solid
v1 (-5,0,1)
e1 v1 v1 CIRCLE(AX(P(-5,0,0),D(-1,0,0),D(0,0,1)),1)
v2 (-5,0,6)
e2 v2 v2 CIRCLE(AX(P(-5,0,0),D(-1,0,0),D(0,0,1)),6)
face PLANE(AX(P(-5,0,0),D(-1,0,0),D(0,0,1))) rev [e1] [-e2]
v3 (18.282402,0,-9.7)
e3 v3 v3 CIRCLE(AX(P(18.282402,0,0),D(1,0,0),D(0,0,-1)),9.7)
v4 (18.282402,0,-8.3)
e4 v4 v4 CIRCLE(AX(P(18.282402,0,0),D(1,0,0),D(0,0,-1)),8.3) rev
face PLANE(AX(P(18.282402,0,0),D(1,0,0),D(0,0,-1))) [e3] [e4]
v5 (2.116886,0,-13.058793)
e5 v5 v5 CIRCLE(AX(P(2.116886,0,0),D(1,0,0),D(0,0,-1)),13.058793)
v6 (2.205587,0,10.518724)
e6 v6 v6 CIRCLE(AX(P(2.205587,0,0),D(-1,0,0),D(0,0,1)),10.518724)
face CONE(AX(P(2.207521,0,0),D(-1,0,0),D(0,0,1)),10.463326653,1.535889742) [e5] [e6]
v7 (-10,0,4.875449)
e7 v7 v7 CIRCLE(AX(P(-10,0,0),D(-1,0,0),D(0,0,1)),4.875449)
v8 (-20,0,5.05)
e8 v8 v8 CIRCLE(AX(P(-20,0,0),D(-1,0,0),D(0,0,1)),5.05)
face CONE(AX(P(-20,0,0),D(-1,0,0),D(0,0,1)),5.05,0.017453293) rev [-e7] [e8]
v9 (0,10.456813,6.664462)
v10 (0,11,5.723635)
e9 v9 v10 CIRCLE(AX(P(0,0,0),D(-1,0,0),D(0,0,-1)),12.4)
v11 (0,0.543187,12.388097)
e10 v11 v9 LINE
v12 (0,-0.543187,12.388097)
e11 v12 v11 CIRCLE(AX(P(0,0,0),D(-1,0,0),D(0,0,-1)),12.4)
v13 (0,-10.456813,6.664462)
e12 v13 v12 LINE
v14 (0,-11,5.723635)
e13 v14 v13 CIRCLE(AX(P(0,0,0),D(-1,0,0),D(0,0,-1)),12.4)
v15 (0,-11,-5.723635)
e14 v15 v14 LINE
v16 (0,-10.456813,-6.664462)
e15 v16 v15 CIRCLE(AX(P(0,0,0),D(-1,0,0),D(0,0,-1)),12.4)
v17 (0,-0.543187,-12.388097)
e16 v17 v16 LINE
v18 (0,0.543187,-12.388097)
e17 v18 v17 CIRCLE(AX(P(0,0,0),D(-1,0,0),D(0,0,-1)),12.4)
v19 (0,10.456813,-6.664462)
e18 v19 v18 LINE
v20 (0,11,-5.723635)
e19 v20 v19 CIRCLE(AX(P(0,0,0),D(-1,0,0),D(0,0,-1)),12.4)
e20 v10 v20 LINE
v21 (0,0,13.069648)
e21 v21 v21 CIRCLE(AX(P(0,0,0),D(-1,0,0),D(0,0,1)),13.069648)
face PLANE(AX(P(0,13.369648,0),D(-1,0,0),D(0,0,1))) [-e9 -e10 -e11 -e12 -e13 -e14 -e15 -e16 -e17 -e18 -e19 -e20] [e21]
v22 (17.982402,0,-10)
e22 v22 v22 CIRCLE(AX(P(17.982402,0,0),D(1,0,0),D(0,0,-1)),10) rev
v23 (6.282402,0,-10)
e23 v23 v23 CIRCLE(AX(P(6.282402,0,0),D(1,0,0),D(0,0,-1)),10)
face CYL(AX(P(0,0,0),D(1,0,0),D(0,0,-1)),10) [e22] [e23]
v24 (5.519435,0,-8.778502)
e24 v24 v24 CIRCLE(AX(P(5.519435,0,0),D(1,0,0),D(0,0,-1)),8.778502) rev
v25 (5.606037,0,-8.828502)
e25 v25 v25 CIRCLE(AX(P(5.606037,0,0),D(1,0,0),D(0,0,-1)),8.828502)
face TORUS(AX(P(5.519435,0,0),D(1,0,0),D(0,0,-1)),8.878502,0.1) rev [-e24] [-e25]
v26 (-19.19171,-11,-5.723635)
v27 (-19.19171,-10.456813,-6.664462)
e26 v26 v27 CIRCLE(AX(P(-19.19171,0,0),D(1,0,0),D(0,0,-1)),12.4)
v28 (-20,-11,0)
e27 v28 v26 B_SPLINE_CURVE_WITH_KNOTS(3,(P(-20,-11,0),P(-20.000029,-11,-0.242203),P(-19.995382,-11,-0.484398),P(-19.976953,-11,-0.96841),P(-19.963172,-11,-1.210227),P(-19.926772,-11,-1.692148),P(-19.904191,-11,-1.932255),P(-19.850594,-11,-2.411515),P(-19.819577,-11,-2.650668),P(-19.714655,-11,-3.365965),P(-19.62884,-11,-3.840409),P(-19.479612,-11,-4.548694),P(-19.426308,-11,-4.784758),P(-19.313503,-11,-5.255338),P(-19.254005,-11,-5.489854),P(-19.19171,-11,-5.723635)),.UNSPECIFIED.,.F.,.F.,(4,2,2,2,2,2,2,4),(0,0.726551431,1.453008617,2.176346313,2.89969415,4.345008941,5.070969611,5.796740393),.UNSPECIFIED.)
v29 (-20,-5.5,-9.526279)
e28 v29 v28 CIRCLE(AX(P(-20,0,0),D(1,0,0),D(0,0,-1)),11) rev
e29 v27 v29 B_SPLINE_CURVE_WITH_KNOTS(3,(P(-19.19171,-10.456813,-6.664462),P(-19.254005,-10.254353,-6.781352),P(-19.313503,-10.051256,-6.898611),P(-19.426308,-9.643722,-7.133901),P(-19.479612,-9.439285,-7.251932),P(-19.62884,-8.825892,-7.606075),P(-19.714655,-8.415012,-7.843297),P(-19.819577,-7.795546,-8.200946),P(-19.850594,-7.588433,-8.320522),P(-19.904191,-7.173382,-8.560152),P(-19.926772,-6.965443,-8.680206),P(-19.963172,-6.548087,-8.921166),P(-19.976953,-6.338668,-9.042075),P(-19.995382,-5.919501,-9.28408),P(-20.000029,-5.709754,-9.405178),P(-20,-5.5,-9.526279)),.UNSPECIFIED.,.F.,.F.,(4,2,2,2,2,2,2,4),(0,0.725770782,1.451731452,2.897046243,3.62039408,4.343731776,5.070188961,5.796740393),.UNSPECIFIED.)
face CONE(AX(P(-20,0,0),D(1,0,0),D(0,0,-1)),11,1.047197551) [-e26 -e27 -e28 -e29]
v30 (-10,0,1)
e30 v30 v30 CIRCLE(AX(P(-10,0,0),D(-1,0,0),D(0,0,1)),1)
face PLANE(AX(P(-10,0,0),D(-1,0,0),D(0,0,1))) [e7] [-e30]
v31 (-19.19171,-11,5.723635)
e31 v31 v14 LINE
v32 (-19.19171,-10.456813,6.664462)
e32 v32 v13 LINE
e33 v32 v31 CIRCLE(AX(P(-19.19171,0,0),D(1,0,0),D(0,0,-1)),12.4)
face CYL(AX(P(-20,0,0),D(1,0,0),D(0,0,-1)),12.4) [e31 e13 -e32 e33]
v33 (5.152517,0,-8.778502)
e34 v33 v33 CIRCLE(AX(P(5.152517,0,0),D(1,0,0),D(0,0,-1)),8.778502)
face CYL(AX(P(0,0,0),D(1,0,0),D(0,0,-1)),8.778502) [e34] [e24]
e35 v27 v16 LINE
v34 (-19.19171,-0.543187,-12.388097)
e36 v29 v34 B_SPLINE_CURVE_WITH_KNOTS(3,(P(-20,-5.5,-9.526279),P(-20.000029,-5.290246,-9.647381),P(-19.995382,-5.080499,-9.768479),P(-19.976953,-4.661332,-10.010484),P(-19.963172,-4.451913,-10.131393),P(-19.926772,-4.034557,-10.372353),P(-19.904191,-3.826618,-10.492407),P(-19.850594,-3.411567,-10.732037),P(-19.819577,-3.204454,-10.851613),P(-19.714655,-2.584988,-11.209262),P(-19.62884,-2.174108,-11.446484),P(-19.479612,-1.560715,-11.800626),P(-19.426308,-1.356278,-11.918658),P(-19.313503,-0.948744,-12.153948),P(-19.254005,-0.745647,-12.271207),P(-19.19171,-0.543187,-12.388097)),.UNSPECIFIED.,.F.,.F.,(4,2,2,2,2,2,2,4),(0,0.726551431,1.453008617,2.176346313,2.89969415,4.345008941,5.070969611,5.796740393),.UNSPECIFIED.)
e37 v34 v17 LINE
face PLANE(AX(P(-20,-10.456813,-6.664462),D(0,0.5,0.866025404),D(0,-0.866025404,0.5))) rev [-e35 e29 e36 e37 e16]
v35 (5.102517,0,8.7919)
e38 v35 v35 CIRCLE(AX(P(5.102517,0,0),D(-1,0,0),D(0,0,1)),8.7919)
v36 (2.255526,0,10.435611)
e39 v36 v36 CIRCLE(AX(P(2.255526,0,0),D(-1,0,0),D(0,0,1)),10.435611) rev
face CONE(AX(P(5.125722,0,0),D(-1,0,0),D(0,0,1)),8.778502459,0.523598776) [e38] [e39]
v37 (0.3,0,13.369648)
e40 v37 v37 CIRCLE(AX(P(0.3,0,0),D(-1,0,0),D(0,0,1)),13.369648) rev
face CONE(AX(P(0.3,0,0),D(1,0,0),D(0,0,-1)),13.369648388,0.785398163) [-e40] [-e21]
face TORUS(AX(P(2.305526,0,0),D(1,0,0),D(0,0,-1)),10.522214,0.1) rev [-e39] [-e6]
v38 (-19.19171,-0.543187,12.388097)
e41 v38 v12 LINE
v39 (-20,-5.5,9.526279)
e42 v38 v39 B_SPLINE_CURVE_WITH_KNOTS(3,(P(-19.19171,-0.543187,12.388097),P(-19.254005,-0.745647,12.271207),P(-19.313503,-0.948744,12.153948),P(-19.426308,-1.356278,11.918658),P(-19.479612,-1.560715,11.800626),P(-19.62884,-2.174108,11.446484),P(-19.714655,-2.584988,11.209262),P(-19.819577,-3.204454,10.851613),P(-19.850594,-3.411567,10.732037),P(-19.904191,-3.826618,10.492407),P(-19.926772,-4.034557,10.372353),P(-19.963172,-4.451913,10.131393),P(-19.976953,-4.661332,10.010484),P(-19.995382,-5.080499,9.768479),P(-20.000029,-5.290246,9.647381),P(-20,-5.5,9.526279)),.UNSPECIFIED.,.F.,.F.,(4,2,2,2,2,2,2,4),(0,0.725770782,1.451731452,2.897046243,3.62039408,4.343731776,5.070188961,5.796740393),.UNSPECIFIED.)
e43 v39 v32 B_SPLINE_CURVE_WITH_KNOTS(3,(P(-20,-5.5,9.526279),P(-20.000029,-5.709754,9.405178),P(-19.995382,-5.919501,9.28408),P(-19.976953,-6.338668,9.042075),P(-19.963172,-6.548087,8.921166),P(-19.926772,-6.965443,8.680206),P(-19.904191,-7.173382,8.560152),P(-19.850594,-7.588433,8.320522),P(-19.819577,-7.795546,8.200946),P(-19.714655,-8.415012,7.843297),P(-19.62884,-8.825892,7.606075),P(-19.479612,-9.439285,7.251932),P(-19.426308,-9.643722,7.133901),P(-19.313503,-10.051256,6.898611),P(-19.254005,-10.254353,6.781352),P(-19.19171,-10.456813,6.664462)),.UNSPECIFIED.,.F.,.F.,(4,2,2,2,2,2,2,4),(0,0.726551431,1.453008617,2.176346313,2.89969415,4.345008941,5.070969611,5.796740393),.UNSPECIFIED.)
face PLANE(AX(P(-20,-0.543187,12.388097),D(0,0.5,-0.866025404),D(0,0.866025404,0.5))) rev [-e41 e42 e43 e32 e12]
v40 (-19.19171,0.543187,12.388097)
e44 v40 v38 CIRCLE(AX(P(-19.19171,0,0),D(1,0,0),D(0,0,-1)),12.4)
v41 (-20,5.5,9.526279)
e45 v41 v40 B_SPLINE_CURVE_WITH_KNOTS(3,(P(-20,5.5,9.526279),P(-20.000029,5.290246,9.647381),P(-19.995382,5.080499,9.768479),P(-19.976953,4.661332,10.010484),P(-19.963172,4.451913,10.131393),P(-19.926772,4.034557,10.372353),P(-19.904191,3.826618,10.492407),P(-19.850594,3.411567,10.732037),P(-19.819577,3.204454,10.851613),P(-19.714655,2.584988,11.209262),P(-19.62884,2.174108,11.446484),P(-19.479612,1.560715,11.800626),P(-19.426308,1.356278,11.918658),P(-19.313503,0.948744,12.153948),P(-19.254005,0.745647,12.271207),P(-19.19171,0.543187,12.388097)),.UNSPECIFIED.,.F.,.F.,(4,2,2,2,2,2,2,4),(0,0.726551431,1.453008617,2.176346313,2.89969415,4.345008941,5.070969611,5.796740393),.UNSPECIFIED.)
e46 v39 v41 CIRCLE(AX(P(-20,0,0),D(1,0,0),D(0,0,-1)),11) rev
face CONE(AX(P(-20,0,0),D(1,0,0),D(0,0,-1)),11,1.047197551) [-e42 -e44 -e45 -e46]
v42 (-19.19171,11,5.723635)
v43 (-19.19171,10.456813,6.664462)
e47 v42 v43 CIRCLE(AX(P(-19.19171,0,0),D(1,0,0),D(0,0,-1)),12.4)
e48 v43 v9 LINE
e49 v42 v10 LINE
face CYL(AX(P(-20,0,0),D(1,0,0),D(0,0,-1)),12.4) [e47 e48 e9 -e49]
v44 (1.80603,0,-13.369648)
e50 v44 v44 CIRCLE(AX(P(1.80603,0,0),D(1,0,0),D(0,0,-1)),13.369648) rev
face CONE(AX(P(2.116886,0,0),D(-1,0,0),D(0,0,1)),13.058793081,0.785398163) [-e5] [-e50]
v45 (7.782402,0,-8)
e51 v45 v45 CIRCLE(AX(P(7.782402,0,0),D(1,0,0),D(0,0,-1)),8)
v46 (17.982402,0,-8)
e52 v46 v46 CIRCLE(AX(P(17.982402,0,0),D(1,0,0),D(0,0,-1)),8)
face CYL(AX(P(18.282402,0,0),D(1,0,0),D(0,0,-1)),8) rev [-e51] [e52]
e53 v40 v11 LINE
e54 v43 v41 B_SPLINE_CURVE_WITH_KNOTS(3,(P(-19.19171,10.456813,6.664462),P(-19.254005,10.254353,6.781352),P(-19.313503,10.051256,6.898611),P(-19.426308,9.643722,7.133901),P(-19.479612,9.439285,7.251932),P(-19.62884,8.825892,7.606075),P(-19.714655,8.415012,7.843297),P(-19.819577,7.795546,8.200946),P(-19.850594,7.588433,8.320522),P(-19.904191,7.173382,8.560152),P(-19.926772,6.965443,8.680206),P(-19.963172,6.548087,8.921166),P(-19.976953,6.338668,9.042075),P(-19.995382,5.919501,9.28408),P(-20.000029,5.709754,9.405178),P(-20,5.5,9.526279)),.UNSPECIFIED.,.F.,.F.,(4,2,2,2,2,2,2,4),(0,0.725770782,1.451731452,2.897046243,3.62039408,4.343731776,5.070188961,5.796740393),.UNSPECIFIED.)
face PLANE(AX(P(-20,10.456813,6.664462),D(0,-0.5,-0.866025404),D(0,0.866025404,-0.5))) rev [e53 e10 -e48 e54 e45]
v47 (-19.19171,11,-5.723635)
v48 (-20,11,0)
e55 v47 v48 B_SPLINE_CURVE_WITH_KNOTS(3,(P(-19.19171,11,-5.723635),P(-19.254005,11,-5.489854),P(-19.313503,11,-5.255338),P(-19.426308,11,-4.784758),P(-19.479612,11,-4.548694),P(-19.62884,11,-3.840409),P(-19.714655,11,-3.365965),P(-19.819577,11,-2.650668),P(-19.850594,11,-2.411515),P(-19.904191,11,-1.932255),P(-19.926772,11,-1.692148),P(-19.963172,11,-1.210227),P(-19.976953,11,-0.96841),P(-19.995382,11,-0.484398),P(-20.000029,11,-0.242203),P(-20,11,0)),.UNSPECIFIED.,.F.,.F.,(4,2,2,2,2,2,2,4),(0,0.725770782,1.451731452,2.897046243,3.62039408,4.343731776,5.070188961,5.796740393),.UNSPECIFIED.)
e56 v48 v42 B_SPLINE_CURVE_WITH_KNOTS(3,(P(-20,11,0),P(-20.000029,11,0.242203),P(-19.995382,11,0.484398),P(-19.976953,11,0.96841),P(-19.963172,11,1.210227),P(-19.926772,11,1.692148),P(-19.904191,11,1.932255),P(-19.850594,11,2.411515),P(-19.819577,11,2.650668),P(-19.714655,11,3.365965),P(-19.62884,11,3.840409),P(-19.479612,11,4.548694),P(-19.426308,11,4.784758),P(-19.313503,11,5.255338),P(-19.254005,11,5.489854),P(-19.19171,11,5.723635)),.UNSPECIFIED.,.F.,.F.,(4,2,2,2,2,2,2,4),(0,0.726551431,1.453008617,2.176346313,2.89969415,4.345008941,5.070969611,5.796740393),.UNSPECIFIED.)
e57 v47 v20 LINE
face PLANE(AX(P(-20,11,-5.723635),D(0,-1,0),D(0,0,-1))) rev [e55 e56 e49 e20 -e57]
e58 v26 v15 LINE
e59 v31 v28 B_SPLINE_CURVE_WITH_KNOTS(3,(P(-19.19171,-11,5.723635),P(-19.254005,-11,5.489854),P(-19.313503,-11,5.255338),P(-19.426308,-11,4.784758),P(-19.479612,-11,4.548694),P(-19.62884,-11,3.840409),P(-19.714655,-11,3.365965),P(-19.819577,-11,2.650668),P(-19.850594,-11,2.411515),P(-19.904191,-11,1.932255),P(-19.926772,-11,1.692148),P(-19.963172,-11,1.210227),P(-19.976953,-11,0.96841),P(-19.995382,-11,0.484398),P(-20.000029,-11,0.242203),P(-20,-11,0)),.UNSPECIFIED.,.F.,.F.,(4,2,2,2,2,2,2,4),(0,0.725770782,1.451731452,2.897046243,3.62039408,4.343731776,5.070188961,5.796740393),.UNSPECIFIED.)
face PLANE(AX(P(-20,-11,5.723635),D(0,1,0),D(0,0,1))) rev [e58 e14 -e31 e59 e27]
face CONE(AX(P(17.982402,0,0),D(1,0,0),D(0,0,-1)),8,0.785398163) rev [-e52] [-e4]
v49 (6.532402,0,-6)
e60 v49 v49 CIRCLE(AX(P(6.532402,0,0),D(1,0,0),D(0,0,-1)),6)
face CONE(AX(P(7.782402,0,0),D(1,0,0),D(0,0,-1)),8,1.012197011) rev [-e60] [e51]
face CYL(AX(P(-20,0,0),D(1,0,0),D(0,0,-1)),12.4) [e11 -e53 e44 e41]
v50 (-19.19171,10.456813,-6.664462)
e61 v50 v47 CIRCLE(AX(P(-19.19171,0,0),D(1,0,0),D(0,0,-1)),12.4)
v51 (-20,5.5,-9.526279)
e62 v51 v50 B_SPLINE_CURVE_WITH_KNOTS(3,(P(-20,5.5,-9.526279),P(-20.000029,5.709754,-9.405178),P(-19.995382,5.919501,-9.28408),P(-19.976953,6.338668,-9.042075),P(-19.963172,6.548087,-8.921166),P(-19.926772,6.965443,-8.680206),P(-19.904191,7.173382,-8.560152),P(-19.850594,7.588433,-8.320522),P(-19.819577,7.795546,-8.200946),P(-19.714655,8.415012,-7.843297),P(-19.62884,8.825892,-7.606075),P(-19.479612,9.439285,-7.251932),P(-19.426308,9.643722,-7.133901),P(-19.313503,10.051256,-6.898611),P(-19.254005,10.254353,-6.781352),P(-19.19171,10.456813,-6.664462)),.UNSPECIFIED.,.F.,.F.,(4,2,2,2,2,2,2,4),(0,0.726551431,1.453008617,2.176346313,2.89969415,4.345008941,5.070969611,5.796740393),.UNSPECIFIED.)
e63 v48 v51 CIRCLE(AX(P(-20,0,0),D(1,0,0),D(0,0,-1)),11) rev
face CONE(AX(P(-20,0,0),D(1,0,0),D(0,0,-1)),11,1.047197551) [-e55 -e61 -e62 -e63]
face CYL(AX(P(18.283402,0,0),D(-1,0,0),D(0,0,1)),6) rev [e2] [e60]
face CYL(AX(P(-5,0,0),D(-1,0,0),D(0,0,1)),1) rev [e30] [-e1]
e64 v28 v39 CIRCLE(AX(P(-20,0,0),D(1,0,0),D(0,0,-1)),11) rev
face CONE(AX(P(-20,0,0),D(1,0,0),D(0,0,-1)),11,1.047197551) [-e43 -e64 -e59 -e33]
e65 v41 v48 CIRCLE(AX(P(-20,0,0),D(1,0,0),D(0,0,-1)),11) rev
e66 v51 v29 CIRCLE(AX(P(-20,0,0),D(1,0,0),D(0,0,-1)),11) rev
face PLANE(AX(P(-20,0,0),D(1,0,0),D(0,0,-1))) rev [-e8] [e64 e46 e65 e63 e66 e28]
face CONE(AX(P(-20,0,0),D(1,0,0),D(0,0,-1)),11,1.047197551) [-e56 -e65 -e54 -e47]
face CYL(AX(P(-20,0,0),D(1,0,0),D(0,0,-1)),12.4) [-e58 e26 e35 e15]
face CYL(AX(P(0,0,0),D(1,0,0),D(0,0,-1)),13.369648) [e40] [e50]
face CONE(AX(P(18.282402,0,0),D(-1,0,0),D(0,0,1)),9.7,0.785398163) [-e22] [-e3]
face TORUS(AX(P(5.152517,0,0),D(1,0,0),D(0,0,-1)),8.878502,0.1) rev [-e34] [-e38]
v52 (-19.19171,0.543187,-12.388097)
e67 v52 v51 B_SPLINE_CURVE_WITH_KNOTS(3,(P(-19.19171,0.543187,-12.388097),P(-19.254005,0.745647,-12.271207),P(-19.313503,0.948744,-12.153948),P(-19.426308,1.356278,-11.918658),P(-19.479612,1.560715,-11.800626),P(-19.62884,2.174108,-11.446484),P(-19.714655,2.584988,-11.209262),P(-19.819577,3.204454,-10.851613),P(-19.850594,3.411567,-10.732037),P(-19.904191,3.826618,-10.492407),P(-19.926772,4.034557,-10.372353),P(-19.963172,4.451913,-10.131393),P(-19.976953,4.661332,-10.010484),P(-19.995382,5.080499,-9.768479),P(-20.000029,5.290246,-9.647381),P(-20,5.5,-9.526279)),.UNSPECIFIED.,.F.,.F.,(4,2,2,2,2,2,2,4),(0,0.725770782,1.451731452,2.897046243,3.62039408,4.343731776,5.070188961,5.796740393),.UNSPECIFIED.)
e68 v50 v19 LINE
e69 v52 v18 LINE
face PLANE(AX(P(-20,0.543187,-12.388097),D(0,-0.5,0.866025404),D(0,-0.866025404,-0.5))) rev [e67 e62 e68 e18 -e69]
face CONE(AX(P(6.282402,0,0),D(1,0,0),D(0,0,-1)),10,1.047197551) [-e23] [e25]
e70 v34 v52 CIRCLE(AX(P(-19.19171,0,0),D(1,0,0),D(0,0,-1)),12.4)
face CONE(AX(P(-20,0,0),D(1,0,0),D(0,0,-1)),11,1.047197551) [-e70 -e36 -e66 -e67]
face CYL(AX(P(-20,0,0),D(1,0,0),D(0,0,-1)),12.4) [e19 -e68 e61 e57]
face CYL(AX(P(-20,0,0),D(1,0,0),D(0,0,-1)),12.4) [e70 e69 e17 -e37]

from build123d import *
from OCP.BRepFilletAPI import BRepFilletAPI_MakeChamfer

# Parameters (mm, degrees)
ESTRUSIONE_ESTRUSIONE1_DEPTH = 20
FORO_16_0_16_1_D             = 16
FORO_16_0_16_1_DEPTH         = 10.5
FORO_16_0_16_1_TIP           = 4.99999996
SMUSSO1_SIZE                 = 0.3
SMUSSO2_SIZE                 = 0.808290377
SMUSSO2_SIZE_2               = 1.4
RACCORDO1_R                  = 0.1
SMUSSO3_SIZE                 = 0.3
SMUSSO3_SIZE2                = 0.311044787
SCHIZZO5_R                   = 5.05
TAGLIO_ESTRUSIONE1_DEPTH     = 10
TAGLIO_ESTRUSIONE1_DRAFT     = -1
SCHIZZO6_R                   = 1
TAGLIO_ESTRUSIONE2_DEPTH     = 5
TAGLIO_ESTRUSIONE3_REACH     = 31.993
SCHIZZO7_R                   = 6


with BuildPart() as part:
    # Schizzo1 → Rivoluzione1 (revolve)
    with BuildSketch(Plane.XY, mode=Mode.PRIVATE) as rivoluzione1_sk:
        Polygon((0, 13.369648388), (0, 0), (18.282401556, 0), (18.282401556, 10), (6.282401556, 10), (5.577169622, 8.778502459), (5.12572234, 8.778502459), (2.207521234, 10.463326653), (2.106030242, 13.369648388), align=None)
    revolve(rivoluzione1_sk.sketch.rotate(Axis((0, 0, 0), (1, 0, 0)), 270), axis=Axis((0, 0, 0), (1, 0, 0)))

    # Schizzo2 → Estrusione-Estrusione1 (add)
    with BuildSketch(Plane.ZY):
        with BuildLine():
            Line((5.723635209, -11), (-5.723635209, -11))
            ThreePointArc((-5.723635209, -11), (-6.2, -10.738715007), (-6.664461837, -10.456813493))
            Line((-6.664461837, -10.456813493), (-12.388097046, -0.543186507))
            ThreePointArc((-12.388097046, -0.543186507), (-12.4, 0), (-12.388097046, 0.543186507))
            Line((-12.388097046, 0.543186507), (-6.664461837, 10.456813493))
            ThreePointArc((-6.664461837, 10.456813493), (-6.2, 10.738715007), (-5.723635209, 11))
            Line((-5.723635209, 11), (5.723635209, 11))
            ThreePointArc((5.723635209, 11), (6.2, 10.738715007), (6.664461837, 10.456813493))
            Line((6.664461837, 10.456813493), (12.388097046, 0.543186507))
            ThreePointArc((12.388097046, 0.543186507), (12.4, 0), (12.388097046, -0.543186507))
            Line((12.388097046, -0.543186507), (6.664461837, -10.456813493))
            ThreePointArc((6.664461837, -10.456813493), (6.2, -10.738715007), (5.723635209, -11))
        make_face()
    extrude(amount=ESTRUSIONE_ESTRUSIONE1_DEPTH)

    # Foro Ø16.0 (16)-1
    with Locations(Plane(origin=(18.282401556, 0, 0), x_dir=(0, 0, -1), z_dir=(1, 0, 0))):
        with Locations((0, 0)):
            Hole(FORO_16_0_16_1_D / 2, depth=FORO_16_0_16_1_DEPTH)
            with Locations((0, 0, -(FORO_16_0_16_1_DEPTH + FORO_16_0_16_1_TIP / 2))):  # 115.989234° drill point
                Cone(0, FORO_16_0_16_1_D / 2, FORO_16_0_16_1_TIP, mode=Mode.SUBTRACT)

    # Smusso1
    smusso1_edges = [part.edges().sort_by_distance(p)[0] for p in [
        (0, 0, 13.369648388),
        (18.282401556, 0, -8),
        (18.282401556, 0, 10),
    ]]
    chamfer(smusso1_edges, length=SMUSSO1_SIZE)

    # Smusso2
    smusso2_edges_1 = [part.edges().sort_by_distance(p)[0] for p in [
        (-20, -10.738715007, -6.2),
    ]]
    smusso2_side_1 = [part.faces().sort_by_distance(p)[0] for p in [
        (-19.983834192, -10.738715007, -6.2),
    ]]
    smusso2_edges_2 = [part.edges().sort_by_distance(p)[0] for p in [
        (-20, 0, -12.4),
    ]]
    smusso2_side_2 = [part.faces().sort_by_distance(p)[0] for p in [
        (-19.983834192, 0, -12.4),
    ]]
    smusso2_edges_3 = [part.edges().sort_by_distance(p)[0] for p in [
        (-20, -10.738715007, 6.2),
    ]]
    smusso2_side_3 = [part.faces().sort_by_distance(p)[0] for p in [
        (-19.983834192, -10.738715007, 6.2),
    ]]
    smusso2_edges_4 = [part.edges().sort_by_distance(p)[0] for p in [
        (-20, 0, 12.4),
    ]]
    smusso2_side_4 = [part.faces().sort_by_distance(p)[0] for p in [
        (-19.983834192, 0, 12.4),
    ]]
    smusso2_edges_5 = [part.edges().sort_by_distance(p)[0] for p in [
        (-20, 10.738715007, 6.2),
    ]]
    smusso2_side_5 = [part.faces().sort_by_distance(p)[0] for p in [
        (-19.983834192, 10.738715007, 6.2),
    ]]
    smusso2_edges_6 = [part.edges().sort_by_distance(p)[0] for p in [
        (-20, 10.738715007, -6.2),
    ]]
    smusso2_side_6 = [part.faces().sort_by_distance(p)[0] for p in [
        (-19.983834192, 10.738715007, -6.2),
    ]]
    smusso2 = BRepFilletAPI_MakeChamfer(part.part.solid().wrapped)
    for e in smusso2_edges_1:
        smusso2.Add(SMUSSO2_SIZE - 0.0001, SMUSSO2_SIZE_2 - 0.0001, e.wrapped, smusso2_side_1[0].wrapped)
    for e in smusso2_edges_2:
        smusso2.Add(SMUSSO2_SIZE - 0.0001, SMUSSO2_SIZE_2 - 0.0001, e.wrapped, smusso2_side_2[0].wrapped)
    for e in smusso2_edges_3:
        smusso2.Add(SMUSSO2_SIZE - 0.0001, SMUSSO2_SIZE_2 - 0.0001, e.wrapped, smusso2_side_3[0].wrapped)
    for e in smusso2_edges_4:
        smusso2.Add(SMUSSO2_SIZE - 0.0001, SMUSSO2_SIZE_2 - 0.0001, e.wrapped, smusso2_side_4[0].wrapped)
    for e in smusso2_edges_5:
        smusso2.Add(SMUSSO2_SIZE - 0.0001, SMUSSO2_SIZE_2 - 0.0001, e.wrapped, smusso2_side_5[0].wrapped)
    for e in smusso2_edges_6:
        smusso2.Add(SMUSSO2_SIZE - 0.0001, SMUSSO2_SIZE_2 - 0.0001, e.wrapped, smusso2_side_6[0].wrapped)
    add(Compound.cast(smusso2.Shape()), mode=Mode.REPLACE)  # a hair under: the kernel refuses the full size

    # Raccordo1
    raccordo1_edges = [part.edges().sort_by_distance(p)[0] for p in [
        (2.207521234, 0, 10.463326653),
        (5.12572234, 0, 8.778502459),
        (5.577169622, 0, 8.778502459),
    ]]
    fillet(raccordo1_edges, radius=RACCORDO1_R)

    # Smusso3
    smusso3_edges = [part.edges().sort_by_distance(p)[0] for p in [
        (2.106030242, 0, 13.369648388),
    ]]
    smusso3_side = [part.faces().sort_by_distance(p)[0] for p in [
        (1.203015121, 0, 13.369648388),
    ]]
    chamfer(smusso3_edges, length=SMUSSO3_SIZE, length2=SMUSSO3_SIZE2, reference=smusso3_side[0])


with BuildPart() as taglio_estrusione1_tool:
    # Schizzo5 → Taglio-Estrusione1 (with draft: the straight prism first)
    with BuildSketch(Plane.ZY.offset(20)):
        Circle(SCHIZZO5_R)
    extrude(amount=-TAGLIO_ESTRUSIONE1_DEPTH)
    # Taglio-Estrusione1: the draft: its side faces are tilted about the plane it starts from
    taglio_estrusione1_sides = [taglio_estrusione1_tool.faces().sort_by_distance(p)[0] for p in [
        (-15, 0, -5.05),
    ]]
    draft(taglio_estrusione1_sides, Plane.ZY.offset(20), TAGLIO_ESTRUSIONE1_DRAFT)


with BuildPart() as part_1:
    add(part.part)

    # Taglio-Estrusione1: cut by taglio_estrusione1_tool
    add(taglio_estrusione1_tool.part, mode=Mode.SUBTRACT)

    # Schizzo6 → Taglio-Estrusione2 (cut)
    with BuildSketch(Plane.ZY.offset(10)):
        Circle(SCHIZZO6_R)
    extrude(amount=-TAGLIO_ESTRUSIONE2_DEPTH, mode=Mode.SUBTRACT)

    # Taglio-Estrusione3: up to this cone (the profile starts outside it)
    taglio_estrusione3_end = Plane(origin=(-5, 0, 0), z_dir=(1, 0, 0)).offset(7.782402556) * Cone(1.6e-06, 39.536957511, 24.710597444, align=(Align.CENTER, Align.CENTER, Align.MIN), mode=Mode.PRIVATE)
    # Schizzo7 → Taglio-Estrusione3 (cut, up to the surface)
    with BuildSketch(Plane.ZY.offset(5), mode=Mode.PRIVATE) as taglio_estrusione3_sk1:
        Circle(SCHIZZO7_R)
    taglio_estrusione3_tool1 = extrude(taglio_estrusione3_sk1.sketch, amount=-TAGLIO_ESTRUSIONE3_REACH, mode=Mode.PRIVATE) - taglio_estrusione3_end
    add(taglio_estrusione3_tool1.solids().sort_by_distance((-5, 0, 0))[0], mode=Mode.SUBTRACT)


solid = part_1.part
